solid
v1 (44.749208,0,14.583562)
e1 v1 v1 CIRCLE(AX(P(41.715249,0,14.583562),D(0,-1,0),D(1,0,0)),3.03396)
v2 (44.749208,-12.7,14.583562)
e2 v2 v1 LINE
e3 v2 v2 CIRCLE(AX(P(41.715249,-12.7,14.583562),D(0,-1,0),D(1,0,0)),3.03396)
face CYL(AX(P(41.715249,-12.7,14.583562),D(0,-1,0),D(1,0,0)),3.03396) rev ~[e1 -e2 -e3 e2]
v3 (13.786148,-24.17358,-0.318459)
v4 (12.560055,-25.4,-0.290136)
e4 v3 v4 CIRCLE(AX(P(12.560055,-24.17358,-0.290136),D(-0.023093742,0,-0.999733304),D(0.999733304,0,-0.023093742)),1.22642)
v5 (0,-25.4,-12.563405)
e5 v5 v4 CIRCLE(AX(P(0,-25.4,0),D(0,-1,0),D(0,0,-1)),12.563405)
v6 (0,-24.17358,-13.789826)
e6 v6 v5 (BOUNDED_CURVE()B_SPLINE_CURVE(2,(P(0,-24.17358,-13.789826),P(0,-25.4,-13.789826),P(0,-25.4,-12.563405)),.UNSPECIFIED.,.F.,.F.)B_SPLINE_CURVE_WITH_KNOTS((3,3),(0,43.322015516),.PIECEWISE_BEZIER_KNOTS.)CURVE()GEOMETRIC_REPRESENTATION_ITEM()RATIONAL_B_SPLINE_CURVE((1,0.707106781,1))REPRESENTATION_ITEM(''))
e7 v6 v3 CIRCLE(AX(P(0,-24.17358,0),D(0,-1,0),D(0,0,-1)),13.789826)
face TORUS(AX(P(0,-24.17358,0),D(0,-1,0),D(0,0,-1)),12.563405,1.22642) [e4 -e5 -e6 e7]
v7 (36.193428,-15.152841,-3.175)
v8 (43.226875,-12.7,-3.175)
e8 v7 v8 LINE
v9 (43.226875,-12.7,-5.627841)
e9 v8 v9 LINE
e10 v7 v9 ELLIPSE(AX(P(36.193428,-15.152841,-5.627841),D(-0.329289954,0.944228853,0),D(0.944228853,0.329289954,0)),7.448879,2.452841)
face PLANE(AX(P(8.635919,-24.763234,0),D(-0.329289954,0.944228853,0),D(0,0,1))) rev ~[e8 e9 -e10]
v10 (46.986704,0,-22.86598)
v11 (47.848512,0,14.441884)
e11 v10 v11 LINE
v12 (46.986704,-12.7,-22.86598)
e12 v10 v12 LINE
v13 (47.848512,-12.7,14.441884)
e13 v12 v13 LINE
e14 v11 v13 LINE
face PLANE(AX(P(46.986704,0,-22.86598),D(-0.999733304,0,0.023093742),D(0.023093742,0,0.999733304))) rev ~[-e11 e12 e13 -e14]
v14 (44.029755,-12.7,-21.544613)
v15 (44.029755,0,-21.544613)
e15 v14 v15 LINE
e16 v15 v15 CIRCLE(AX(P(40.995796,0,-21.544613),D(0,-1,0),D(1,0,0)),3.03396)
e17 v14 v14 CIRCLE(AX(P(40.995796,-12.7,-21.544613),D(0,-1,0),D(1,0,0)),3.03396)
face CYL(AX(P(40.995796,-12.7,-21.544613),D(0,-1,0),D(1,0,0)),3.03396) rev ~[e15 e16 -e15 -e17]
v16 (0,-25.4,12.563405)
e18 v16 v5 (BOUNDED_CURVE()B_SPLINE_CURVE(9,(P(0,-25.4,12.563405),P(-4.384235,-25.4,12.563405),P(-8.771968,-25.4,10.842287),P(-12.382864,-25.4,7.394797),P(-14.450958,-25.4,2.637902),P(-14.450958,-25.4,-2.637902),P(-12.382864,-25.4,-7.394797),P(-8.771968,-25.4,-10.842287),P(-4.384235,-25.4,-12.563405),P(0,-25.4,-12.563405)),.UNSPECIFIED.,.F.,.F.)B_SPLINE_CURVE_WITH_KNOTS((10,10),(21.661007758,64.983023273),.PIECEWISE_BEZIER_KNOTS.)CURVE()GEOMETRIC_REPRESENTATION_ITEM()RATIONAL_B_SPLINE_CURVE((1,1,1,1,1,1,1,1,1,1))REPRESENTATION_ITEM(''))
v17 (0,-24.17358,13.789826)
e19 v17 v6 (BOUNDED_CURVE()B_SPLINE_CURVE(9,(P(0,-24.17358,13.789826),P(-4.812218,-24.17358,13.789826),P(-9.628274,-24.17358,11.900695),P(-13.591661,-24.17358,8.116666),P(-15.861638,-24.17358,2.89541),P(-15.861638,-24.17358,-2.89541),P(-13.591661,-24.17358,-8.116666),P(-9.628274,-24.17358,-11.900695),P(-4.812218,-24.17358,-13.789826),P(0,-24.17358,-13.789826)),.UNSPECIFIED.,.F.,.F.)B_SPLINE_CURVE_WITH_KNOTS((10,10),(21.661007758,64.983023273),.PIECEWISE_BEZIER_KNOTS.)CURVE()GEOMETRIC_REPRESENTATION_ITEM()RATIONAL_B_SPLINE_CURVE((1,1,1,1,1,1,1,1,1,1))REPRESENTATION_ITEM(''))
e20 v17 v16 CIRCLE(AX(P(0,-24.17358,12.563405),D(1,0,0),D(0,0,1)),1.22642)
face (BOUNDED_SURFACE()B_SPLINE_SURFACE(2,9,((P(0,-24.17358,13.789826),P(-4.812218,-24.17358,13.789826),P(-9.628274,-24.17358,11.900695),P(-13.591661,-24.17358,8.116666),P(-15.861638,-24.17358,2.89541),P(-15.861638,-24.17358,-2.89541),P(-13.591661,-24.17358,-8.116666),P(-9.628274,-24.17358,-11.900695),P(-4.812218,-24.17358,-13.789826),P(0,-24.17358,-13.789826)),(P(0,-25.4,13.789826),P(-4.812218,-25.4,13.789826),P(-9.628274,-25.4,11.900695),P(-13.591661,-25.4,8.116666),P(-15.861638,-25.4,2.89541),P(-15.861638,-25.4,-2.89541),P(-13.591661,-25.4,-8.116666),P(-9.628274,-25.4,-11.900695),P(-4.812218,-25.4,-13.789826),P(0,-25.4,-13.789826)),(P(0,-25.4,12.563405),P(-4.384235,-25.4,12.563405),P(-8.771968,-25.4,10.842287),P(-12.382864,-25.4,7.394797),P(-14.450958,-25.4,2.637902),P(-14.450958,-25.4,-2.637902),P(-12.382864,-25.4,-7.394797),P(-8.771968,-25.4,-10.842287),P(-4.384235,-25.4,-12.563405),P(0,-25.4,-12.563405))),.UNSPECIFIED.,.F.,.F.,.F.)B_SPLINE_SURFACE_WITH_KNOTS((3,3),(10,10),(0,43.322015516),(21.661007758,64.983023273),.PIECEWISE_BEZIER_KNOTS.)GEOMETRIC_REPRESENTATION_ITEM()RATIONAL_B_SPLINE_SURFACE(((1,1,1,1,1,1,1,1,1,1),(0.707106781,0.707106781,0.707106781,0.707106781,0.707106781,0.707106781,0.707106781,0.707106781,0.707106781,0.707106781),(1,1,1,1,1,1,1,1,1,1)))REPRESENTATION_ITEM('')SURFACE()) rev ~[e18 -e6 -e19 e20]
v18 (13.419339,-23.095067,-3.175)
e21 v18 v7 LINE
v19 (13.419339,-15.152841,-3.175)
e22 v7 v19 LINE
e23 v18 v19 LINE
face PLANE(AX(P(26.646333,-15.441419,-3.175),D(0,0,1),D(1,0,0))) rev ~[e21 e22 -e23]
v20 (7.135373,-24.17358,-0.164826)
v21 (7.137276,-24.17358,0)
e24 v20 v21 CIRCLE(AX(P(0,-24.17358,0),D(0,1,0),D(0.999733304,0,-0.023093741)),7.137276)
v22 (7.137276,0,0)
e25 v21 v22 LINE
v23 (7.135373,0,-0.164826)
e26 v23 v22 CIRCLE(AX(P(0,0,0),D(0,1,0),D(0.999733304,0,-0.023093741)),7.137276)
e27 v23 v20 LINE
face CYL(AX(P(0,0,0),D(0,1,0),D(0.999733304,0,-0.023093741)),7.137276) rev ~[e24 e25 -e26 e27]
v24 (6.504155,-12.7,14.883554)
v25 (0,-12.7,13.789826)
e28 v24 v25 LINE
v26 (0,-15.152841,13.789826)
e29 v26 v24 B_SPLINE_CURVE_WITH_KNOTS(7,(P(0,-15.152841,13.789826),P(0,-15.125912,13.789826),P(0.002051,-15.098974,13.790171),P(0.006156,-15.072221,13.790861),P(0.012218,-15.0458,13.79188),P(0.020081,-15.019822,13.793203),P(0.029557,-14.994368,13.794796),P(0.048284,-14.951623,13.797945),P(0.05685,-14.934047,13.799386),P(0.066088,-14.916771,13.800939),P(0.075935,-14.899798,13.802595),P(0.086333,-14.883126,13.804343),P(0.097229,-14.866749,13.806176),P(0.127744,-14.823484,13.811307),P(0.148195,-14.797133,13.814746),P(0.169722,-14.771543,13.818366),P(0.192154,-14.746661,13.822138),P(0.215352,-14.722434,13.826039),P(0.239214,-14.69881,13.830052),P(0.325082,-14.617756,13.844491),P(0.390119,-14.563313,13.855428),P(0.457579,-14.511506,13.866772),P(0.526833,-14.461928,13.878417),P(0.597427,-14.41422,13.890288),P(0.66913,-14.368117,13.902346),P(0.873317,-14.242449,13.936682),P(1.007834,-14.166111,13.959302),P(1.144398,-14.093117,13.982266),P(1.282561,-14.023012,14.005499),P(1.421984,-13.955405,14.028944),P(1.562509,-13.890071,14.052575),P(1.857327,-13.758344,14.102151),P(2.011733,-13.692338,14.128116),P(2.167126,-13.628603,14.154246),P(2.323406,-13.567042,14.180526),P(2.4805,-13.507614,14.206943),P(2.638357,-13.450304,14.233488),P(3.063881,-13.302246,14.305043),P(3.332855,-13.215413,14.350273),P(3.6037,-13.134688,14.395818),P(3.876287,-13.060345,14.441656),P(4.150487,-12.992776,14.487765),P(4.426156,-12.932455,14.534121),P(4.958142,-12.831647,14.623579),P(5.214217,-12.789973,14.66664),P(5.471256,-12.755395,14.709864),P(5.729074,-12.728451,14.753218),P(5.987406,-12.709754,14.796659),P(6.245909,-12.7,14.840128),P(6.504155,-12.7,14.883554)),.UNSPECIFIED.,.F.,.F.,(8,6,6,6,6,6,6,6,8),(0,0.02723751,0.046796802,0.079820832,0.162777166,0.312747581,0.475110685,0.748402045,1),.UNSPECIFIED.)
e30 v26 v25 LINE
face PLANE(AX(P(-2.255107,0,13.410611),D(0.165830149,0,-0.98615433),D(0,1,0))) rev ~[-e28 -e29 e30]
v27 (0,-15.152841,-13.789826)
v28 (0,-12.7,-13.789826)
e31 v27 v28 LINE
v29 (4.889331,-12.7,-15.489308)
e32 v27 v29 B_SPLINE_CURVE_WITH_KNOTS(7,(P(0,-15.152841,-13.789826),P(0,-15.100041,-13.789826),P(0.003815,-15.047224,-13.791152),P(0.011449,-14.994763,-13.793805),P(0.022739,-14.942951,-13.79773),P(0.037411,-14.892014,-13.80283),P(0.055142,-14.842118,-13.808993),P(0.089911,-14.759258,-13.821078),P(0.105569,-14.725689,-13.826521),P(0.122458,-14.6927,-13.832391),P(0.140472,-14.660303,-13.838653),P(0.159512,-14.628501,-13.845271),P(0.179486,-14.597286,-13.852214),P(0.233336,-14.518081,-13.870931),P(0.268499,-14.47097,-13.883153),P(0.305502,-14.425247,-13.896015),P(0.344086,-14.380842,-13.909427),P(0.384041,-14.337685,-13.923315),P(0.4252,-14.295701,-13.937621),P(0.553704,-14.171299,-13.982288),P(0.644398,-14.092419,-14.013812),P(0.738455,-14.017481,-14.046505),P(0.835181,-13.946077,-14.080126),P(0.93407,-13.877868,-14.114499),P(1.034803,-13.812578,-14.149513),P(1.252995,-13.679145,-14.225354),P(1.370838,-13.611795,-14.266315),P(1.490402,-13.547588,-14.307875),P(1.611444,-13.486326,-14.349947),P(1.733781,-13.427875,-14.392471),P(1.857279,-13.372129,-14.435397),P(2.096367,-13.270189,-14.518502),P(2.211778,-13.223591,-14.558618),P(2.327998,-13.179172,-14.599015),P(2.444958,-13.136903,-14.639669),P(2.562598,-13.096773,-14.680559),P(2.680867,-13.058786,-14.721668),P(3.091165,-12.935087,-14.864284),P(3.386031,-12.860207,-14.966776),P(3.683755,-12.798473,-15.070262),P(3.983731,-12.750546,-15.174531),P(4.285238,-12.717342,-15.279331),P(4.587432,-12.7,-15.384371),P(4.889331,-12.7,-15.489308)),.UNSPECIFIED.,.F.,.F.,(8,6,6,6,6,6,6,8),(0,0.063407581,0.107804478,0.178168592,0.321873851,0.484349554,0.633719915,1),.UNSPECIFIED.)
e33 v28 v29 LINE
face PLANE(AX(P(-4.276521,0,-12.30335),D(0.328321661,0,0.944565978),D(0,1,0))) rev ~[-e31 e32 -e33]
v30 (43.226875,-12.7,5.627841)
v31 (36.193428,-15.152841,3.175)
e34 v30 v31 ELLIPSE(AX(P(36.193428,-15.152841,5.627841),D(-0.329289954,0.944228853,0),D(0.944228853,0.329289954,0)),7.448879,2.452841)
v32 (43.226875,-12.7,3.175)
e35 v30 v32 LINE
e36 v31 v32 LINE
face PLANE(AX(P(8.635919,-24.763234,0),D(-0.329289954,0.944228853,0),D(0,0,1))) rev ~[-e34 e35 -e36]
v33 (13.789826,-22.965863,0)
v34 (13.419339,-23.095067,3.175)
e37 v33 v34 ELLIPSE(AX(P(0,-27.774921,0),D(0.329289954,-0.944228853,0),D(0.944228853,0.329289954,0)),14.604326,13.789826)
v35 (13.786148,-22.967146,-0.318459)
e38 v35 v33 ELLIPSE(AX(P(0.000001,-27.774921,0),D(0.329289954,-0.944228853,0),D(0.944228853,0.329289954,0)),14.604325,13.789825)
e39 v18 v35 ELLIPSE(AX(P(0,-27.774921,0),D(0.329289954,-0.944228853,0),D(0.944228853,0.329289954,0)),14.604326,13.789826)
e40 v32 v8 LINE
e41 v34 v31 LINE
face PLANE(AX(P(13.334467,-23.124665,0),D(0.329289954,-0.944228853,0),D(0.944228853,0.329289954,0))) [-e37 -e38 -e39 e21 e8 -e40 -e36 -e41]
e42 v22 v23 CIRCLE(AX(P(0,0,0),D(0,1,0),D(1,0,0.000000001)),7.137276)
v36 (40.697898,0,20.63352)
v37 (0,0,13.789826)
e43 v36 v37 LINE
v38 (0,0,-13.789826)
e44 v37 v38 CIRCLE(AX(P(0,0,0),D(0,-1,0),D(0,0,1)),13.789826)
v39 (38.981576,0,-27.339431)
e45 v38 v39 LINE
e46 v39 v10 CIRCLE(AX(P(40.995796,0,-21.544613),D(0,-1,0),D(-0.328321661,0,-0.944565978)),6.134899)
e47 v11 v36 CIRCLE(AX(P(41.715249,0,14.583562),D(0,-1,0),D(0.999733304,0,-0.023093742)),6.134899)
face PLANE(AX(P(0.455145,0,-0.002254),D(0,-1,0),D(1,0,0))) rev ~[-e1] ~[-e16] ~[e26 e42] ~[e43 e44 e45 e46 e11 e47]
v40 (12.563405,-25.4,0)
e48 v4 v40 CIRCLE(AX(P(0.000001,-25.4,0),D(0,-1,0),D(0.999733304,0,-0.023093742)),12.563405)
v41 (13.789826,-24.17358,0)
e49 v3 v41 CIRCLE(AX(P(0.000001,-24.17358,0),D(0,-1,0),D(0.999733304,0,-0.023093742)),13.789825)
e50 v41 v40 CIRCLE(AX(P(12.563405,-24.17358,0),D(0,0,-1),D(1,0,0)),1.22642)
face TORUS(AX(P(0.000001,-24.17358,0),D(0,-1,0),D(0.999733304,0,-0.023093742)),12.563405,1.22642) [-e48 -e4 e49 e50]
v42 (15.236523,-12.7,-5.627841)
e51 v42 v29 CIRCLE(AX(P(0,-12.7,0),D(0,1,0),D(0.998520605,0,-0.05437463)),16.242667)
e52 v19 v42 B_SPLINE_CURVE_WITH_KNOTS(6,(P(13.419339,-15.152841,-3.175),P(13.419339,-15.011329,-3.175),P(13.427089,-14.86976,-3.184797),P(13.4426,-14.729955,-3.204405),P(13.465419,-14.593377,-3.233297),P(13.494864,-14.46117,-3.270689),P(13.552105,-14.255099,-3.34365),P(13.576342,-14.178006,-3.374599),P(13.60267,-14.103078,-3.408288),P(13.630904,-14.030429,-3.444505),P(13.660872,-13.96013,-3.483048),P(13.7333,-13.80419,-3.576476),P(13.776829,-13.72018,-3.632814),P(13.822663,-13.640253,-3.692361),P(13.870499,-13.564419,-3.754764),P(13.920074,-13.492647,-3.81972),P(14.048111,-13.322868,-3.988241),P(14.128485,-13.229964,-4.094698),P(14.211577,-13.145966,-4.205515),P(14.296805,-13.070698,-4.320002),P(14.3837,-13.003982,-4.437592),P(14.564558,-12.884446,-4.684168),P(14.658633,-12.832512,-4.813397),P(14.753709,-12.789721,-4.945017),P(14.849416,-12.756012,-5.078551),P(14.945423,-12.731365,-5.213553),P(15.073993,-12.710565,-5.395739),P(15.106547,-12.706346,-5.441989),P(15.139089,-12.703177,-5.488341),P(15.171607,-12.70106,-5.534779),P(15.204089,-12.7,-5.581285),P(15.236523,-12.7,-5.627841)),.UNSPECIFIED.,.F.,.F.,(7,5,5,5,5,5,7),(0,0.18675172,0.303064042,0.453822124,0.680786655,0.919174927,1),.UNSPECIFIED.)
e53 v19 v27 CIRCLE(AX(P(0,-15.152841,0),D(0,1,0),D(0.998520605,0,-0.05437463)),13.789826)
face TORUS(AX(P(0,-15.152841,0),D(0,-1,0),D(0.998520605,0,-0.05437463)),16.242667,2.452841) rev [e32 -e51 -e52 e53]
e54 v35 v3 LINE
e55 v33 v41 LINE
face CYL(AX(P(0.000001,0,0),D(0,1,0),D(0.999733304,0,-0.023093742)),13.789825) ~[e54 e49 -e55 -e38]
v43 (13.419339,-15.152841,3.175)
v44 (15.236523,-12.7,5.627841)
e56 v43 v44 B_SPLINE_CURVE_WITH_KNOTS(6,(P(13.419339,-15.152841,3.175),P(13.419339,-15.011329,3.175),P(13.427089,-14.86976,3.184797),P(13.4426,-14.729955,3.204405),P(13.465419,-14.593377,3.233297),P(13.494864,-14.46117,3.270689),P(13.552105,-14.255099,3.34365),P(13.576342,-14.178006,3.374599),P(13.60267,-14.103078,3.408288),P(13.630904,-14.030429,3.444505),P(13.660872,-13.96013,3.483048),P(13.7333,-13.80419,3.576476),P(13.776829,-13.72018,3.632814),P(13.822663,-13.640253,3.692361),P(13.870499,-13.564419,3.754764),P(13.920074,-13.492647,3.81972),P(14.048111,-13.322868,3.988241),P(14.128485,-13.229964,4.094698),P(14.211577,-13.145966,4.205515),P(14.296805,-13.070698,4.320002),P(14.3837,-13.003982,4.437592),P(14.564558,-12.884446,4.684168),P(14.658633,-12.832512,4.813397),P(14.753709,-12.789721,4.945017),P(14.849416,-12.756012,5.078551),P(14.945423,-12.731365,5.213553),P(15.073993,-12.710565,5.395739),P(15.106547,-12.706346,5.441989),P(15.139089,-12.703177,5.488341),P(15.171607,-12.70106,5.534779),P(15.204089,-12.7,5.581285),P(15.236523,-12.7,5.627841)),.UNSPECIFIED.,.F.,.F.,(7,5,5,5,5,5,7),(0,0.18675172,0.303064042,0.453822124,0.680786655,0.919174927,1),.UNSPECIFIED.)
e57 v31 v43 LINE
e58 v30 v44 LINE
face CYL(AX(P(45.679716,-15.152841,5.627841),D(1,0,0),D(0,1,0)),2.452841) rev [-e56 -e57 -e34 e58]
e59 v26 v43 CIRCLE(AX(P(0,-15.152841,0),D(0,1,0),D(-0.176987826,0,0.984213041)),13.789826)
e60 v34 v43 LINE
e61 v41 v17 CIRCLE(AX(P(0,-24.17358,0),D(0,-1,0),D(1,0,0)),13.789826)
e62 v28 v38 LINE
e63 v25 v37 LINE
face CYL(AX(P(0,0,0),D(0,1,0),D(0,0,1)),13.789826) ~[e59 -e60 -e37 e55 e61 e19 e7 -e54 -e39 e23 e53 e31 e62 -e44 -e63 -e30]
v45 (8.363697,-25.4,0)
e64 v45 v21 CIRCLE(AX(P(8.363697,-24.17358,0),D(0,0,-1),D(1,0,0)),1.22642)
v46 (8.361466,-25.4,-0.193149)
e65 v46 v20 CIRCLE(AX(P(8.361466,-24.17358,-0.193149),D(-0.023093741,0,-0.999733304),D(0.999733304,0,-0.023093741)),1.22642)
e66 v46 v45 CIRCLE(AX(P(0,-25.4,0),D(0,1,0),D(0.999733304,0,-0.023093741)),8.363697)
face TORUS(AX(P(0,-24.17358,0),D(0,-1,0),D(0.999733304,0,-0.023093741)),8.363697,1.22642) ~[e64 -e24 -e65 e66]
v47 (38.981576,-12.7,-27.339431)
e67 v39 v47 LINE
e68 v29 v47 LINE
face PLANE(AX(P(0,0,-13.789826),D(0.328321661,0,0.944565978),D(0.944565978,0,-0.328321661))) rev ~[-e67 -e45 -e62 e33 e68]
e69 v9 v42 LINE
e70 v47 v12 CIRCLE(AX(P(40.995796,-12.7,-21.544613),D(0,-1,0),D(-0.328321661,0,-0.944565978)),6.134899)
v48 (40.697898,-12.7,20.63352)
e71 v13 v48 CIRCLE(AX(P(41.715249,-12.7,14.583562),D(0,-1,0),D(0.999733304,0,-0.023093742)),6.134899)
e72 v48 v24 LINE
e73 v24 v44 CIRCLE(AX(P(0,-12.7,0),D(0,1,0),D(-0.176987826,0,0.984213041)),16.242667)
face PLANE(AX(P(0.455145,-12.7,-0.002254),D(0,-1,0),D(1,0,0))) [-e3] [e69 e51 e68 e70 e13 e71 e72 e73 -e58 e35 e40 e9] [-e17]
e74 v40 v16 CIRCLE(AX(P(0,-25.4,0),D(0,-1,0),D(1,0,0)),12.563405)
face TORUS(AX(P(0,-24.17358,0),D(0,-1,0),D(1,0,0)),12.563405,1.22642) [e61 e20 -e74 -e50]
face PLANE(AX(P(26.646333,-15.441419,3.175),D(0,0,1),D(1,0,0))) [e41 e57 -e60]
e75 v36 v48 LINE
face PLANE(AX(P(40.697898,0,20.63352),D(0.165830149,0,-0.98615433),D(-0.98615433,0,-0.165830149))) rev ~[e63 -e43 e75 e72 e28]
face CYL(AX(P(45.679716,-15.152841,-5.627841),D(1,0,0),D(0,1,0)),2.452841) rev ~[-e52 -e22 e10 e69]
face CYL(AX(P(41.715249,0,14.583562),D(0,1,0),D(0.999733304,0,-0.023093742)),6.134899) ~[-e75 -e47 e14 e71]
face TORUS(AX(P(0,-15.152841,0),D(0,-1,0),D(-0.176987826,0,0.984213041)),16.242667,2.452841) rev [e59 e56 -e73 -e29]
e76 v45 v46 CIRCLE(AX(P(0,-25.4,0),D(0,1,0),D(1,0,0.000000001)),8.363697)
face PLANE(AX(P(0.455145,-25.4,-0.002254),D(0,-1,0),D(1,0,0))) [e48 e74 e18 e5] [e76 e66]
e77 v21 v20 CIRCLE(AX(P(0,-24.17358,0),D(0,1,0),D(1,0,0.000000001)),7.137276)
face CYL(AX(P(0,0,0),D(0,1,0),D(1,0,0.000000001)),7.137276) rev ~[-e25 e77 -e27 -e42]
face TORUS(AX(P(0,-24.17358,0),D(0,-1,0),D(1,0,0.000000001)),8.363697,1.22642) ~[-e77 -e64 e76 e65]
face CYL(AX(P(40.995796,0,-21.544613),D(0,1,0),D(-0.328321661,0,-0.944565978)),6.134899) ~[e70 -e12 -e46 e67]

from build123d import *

# Parameters (mm, degrees)
F1_DEPTH     = 12.7
F2_DEPTH     = 25.4
F3_R         = 3.0339595682
F4_DEPTH     = 25.4
F5_R         = 1.2264204897
F7_DEPTH     = 3.175
F8_T4_ANGLE  = 97.0773840638
F8_T9_DEPTH  = 34.7132171162
F8_T14_ANGLE = 97.0773840638
F8_T19_DEPTH = 34.7132171162


# Not quite as in the source:
# - a fillet or chamfer that OpenCascade refuses, or shapes differently, is made with other operations: its cross-section is extruded or revolved along the edge and cut away or added


with BuildPart() as f1:
    # F0 (on Front) → F1 (new body)
    with BuildSketch(Plane.XZ):
        with BuildLine():
            ThreePointArc((0, -13.789825828), (9.6376295499, -9.8628288552), (13.7861481364, -0.3184586768))
            ThreePointArc((13.7861481364, -0.3184586768), (13.7889063745, -0.1592399559), (13.789825828, 0))
            ThreePointArc((13.789825828, 0), (9.7508793544, 9.7508793544), (0, 13.789825828))
            ThreePointArc((0, 13.789825828), (-13.789825828, 0), (0, -13.789825828))
        make_face()
        with BuildLine():
            ThreePointArc((7.1353728529, -0.1648264167), (-7.1368004494, 0.0824187037), (7.137276336, 0))
            ThreePointArc((7.137276336, 0), (7.1368004494, -0.0824187037), (7.1353728529, -0.1648264167))
        make_face(mode=Mode.SUBTRACT)
        with BuildLine():
            ThreePointArc((13.789825828, 0), (13.7889063745, -0.1592399559), (13.7861481364, -0.3184586768))
            ThreePointArc((13.7861481364, -0.3184586768), (9.6376295499, -9.8628288552), (0, -13.789825828))
            Line((0, -13.789825828), (38.9815755188, -27.3394305259))
            ThreePointArc((38.9815755188, -27.3394305259), (43.9885292005, -26.9000346666), (46.9867042389, -22.8659795937))
            Line((46.9867042389, -22.8659795937), (47.8485122544, 14.4418842975))
            ThreePointArc((47.8485122544, 14.4418842975), (45.7311207367, 19.22142423), (40.6978976177, 20.6335197794))
            Line((40.6978976177, 20.6335197794), (0, 13.789825828))
            ThreePointArc((0, 13.789825828), (9.7508793544, 9.7508793544), (13.789825828, 0))
        make_face()
    extrude(amount=F1_DEPTH)

    # F0 (on Front) → F2 (join)
    with BuildSketch(Plane.XZ):
        with BuildLine():
            ThreePointArc((0, -13.789825828), (9.6376295499, -9.8628288552), (13.7861481364, -0.3184586768))
            ThreePointArc((13.7861481364, -0.3184586768), (13.7889063745, -0.1592399559), (13.789825828, 0))
            ThreePointArc((13.789825828, 0), (9.7508793544, 9.7508793544), (0, 13.789825828))
            ThreePointArc((0, 13.789825828), (-13.789825828, 0), (0, -13.789825828))
        make_face()
        with BuildLine():
            ThreePointArc((7.1353728529, -0.1648264167), (-7.1368004494, 0.0824187037), (7.137276336, 0))
            ThreePointArc((7.137276336, 0), (7.1368004494, -0.0824187037), (7.1353728529, -0.1648264167))
        make_face(mode=Mode.SUBTRACT)
    extrude(amount=F2_DEPTH)

    # F3 (on face) → F4 (cut)
    with BuildSketch(Plane.XZ.offset(12.7)):
        with Locations((40.9957959094, -21.5446131849)):
            Circle(F3_R)
        with Locations((41.715248914, 14.5835620822)):
            Circle(F3_R)
    extrude(amount=-F4_DEPTH, mode=Mode.SUBTRACT)

    # F5
    f5_edges = [f1.edges().sort_by_distance(p)[0] for p in [
        (0, -25.4, 13.789826),
        (-7.137276, -25.4, 0),
    ]]
    fillet(f5_edges, radius=F5_R)

    # F6 (on Top) → F7 (join, symmetric)
    with BuildSketch(Plane.XY):
        Polygon((13.3344670758, -12.2673781589), (13.3344670758, -23.1246650219), (44.4674044847, -12.2673781589), align=None)
    extrude(amount=F7_DEPTH, both=True)

    # F8: fillet of radius 2.4528409794 on 4 edges, made by hand


with BuildPart() as f8_tool2:
    # F8_s3 → F8_t4 (revolve)
    with BuildSketch(Plane(origin=(0, 0, 0), x_dir=(0, 1, 0), z_dir=(0.0543746304, 0, 0.9985206055))):
        with BuildLine():
            ThreePointArc((-15.1528409794, -13.789825828), (-13.4184204897, -14.5082463177), (-12.7, -16.2426668074))
            Line((-12.7, -16.2426668074), (-12.6509431804, -16.2426668074))
            Line((-12.6509431804, -16.2426668074), (-12.6509431804, -13.7407690084))
            Line((-12.6509431804, -13.7407690084), (-15.1528409794, -13.7407690084))
            Line((-15.1528409794, -13.7407690084), (-15.1528409794, -13.789825828))
        make_face()
    revolve(axis=Axis((0, -12.7, 0), (0, 1, 0)), revolution_arc=F8_T4_ANGLE)

    split(bisect_by=Plane(origin=(-4.2765210661, 0, -12.3033499954), x_dir=(0, 1, 0), z_dir=(0.3283216608, 0, 0.9445659781)), keep=Keep.TOP)


with BuildPart() as f1_1:
    add(f1.part)

    # F8_t1: union F8_tool2
    add(f8_tool2.part)


with BuildPart() as f8_tool7:
    # F8_s8 → F8_t9 (new body)
    with BuildSketch(Plane.YZ.offset(45.6797155903)):
        with BuildLine():
            ThreePointArc((-12.7, -5.6278409794), (-13.4184204897, -3.8934204897), (-15.1528409794, -3.175))
            Line((-15.1528409794, -3.175), (-15.1528409794, -3.1259431804))
            Line((-15.1528409794, -3.1259431804), (-12.6509431804, -3.1259431804))
            Line((-12.6509431804, -3.1259431804), (-12.6509431804, -5.6278409794))
            Line((-12.6509431804, -5.6278409794), (-12.7, -5.6278409794))
        make_face()
    extrude(amount=-F8_T9_DEPTH)

    split(bisect_by=Plane(origin=(8.6359194604, -24.7632344453, 0), x_dir=(0, 0, 1), z_dir=(-0.3292899537, 0.9442288528, 0)), keep=Keep.TOP)


with BuildPart() as f1_2:
    add(f1_1.part)

    # F8_t6: union F8_tool7
    add(f8_tool7.part)


with BuildPart() as f8_tool12:
    # F8_s13 → F8_t14 (revolve)
    with BuildSketch(Plane(origin=(0, 0, 0), x_dir=(0, 1, 0), z_dir=(-0.9842130406, 0, -0.1769878264))):
        with BuildLine():
            ThreePointArc((-15.1528409794, -13.789825828), (-13.4184204897, -14.5082463177), (-12.7, -16.2426668074))
            Line((-12.7, -16.2426668074), (-12.6509431804, -16.2426668074))
            Line((-12.6509431804, -16.2426668074), (-12.6509431804, -13.7407690084))
            Line((-12.6509431804, -13.7407690084), (-15.1528409794, -13.7407690084))
            Line((-15.1528409794, -13.7407690084), (-15.1528409794, -13.789825828))
        make_face()
    revolve(axis=Axis((0, -12.7, 0), (0, 1, 0)), revolution_arc=F8_T14_ANGLE)

    split(bisect_by=Plane(origin=(-2.2551070217, 0, 13.4106106059), x_dir=(0, 1, 0), z_dir=(0.1658301489, 0, -0.9861543296)), keep=Keep.TOP)


with BuildPart() as f1_3:
    add(f1_2.part)

    # F8_t11: union F8_tool12
    add(f8_tool12.part)


with BuildPart() as f8_tool17:
    # F8_s18 → F8_t19 (new body)
    with BuildSketch(Plane.YZ.offset(45.6797155903)):
        with BuildLine():
            ThreePointArc((-12.7, 5.6278409794), (-13.4184204897, 3.8934204897), (-15.1528409794, 3.175))
            Line((-15.1528409794, 3.175), (-15.1528409794, 3.1259431804))
            Line((-15.1528409794, 3.1259431804), (-12.6509431804, 3.1259431804))
            Line((-12.6509431804, 3.1259431804), (-12.6509431804, 5.6278409794))
            Line((-12.6509431804, 5.6278409794), (-12.7, 5.6278409794))
        make_face()
    extrude(amount=-F8_T19_DEPTH)

    split(bisect_by=Plane(origin=(8.6359194604, -24.7632344453, 0), x_dir=(0, 0, 1), z_dir=(-0.3292899537, 0.9442288528, 0)), keep=Keep.TOP)


with BuildPart() as f1_4:
    add(f1_3.part)

    # F8_t16: union F8_tool17
    add(f8_tool17.part)


solid = f1_4.part
